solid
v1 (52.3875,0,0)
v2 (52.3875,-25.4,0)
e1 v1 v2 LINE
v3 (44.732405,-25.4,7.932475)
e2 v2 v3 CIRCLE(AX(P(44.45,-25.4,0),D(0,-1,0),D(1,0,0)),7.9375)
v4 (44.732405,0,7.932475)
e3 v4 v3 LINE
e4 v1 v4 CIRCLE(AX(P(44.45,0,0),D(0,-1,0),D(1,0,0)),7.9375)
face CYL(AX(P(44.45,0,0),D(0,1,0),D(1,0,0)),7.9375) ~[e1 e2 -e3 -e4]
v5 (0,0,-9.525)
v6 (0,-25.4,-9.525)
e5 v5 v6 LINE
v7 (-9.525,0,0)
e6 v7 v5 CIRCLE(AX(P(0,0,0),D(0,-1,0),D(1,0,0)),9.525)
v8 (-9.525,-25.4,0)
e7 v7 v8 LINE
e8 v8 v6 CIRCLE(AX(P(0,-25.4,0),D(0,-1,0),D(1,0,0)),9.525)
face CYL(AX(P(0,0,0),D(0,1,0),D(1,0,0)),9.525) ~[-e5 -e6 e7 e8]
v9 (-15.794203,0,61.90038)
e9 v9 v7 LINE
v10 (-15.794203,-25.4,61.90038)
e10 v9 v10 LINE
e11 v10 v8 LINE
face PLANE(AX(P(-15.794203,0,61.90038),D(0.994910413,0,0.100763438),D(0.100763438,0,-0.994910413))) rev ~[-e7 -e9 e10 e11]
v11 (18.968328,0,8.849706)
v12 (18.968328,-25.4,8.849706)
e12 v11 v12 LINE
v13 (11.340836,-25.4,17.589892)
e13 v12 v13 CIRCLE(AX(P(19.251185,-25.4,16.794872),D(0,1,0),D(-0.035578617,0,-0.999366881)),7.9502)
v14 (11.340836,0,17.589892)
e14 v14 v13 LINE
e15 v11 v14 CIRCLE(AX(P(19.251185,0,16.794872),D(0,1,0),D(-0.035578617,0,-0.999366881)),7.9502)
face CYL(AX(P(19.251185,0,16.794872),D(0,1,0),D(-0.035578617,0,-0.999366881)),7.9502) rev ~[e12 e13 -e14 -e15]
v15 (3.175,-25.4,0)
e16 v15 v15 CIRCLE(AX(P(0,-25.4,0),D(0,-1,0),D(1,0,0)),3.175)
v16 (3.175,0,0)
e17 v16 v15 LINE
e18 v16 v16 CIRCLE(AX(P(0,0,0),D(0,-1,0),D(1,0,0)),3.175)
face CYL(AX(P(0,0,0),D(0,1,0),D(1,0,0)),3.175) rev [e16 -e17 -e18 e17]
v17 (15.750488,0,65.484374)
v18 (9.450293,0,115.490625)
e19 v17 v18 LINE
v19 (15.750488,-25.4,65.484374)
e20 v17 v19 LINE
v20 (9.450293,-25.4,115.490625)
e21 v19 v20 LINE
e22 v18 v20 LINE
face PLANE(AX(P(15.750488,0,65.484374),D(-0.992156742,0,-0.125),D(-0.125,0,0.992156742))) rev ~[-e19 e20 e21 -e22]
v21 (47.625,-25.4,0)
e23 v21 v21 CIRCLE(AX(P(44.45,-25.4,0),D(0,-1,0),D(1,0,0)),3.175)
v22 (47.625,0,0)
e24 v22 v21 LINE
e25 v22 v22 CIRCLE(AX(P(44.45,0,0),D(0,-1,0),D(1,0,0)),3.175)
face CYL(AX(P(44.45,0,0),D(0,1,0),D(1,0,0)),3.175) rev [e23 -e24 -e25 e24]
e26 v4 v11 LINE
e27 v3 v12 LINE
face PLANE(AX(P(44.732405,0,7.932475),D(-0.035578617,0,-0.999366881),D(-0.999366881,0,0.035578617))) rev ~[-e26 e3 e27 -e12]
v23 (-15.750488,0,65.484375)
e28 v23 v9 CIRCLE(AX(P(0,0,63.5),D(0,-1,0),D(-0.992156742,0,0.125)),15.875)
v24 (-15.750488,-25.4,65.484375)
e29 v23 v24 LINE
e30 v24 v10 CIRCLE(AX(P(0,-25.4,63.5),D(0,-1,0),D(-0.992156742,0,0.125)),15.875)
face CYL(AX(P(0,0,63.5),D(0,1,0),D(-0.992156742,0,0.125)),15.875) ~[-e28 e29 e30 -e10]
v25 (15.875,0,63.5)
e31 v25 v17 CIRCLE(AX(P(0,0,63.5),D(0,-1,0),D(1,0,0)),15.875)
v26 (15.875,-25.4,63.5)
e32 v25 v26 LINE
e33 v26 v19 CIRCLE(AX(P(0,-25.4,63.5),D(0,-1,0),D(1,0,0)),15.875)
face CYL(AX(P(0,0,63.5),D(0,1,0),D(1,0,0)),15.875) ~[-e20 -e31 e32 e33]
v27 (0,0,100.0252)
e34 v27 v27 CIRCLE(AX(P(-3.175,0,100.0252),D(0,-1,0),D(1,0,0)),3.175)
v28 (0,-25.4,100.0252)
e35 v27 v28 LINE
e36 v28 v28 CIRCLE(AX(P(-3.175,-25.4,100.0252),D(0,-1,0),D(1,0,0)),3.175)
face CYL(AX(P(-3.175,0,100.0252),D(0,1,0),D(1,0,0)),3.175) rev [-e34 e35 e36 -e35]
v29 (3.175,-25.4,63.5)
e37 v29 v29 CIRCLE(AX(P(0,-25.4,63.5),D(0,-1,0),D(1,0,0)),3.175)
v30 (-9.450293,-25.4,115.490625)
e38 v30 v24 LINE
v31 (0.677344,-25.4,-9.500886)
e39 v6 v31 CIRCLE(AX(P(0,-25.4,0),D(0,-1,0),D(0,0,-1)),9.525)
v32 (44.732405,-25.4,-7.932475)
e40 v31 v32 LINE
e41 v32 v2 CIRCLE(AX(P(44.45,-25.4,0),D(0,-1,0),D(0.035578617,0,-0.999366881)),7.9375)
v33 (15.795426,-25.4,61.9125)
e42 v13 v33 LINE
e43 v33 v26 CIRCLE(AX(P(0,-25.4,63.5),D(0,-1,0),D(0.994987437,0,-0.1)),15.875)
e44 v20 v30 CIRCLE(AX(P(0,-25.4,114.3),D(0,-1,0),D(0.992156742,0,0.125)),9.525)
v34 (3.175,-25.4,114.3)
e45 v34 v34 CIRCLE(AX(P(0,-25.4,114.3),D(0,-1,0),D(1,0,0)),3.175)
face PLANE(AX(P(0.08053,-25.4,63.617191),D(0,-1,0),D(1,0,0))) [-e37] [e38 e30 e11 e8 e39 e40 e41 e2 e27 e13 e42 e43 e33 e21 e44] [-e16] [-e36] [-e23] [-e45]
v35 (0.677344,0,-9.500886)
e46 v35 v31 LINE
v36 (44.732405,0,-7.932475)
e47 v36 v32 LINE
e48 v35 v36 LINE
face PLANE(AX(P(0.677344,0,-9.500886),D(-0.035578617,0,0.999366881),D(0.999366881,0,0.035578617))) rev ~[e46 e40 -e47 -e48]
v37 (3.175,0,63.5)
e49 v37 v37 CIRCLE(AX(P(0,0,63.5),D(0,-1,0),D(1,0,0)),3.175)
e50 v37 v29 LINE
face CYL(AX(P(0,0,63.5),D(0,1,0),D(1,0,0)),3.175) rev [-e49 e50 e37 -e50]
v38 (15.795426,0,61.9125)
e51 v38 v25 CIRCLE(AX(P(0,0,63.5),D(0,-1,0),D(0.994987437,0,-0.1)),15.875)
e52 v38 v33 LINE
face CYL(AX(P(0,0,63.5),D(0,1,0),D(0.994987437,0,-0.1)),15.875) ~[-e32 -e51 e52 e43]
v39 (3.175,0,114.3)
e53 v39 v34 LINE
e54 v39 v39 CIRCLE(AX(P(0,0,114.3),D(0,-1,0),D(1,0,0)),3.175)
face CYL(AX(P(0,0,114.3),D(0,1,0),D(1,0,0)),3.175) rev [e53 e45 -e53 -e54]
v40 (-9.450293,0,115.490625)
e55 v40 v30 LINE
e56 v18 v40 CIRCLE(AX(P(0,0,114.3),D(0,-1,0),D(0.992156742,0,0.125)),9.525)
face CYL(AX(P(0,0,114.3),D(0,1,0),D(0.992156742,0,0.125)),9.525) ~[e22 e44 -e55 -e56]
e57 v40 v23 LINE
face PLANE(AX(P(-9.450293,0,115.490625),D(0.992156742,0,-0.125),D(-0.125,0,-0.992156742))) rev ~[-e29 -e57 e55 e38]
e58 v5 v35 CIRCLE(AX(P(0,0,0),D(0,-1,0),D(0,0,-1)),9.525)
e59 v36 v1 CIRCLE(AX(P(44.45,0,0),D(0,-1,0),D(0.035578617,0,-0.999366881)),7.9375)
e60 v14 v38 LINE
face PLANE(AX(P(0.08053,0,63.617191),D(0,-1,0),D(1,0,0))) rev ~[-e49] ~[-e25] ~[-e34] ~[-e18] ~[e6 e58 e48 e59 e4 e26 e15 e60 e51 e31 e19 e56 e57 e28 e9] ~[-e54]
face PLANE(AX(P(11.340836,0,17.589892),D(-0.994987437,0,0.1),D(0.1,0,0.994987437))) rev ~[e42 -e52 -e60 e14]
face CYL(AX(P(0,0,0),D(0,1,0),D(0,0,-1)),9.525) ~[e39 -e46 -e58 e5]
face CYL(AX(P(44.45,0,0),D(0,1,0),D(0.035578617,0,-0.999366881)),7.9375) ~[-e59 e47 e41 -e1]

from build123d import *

# Parameters (mm, degrees)
F2_R     = 3.175
F3_DEPTH = 25.4


# Not quite as in the source:
# - a feature names something its author has since deleted; it is built from what else it names


with BuildPart() as f3:
    # F2 (on Front) → F3 (new body)
    with BuildSketch(Plane.XZ):
        with BuildLine():
            ThreePointArc((15.7504884308, 65.4843737526), (6.286e-07, 79.375), (-15.7504882737, 65.484375))
            ThreePointArc((-15.7504882737, 65.484375), (-15.8738192656, 63.6936154008), (-15.7942028036, 61.9003804205))
            ThreePointArc((-15.7942028036, 61.9003804205), (0.0060905531, 47.6250011683), (15.7954255641, 61.9125))
            ThreePointArc((15.7954255641, 61.9125), (15.8550939106, 62.7052534459), (15.875, 63.5))
            ThreePointArc((15.875, 63.5), (15.8438415297, 64.4941381092), (15.7504884308, 65.4843737526))
        make_face()
        with Locations((0, 63.5)):
            Circle(F2_R, mode=Mode.SUBTRACT)
        with BuildLine():
            Line((-9.4502929642, 115.490625), (-15.7504882737, 65.484375))
            ThreePointArc((-15.7504882737, 65.484375), (6.286e-07, 79.375), (15.7504884308, 65.4843737526))
            Line((15.7504884308, 65.4843737526), (9.4502929642, 115.490625))
            ThreePointArc((9.4502929642, 115.490625), (9.5063048942, 114.896483242), (9.525, 114.3))
            ThreePointArc((9.525, 114.3), (-0.596483242, 104.7936951058), (-9.4502929642, 115.490625))
        make_face()
        with Locations((-3.175, 100.0252)):
            Circle(F2_R, mode=Mode.SUBTRACT)
        with BuildLine():
            ThreePointArc((15.7954255641, 61.9125), (0.0060905531, 47.6250011683), (-15.7942028036, 61.9003804205))
            Line((-15.7942028036, 61.9003804205), (-9.525, 0))
            ThreePointArc((-9.525, 0), (0, 9.525), (9.525, 0))
            ThreePointArc((9.525, 0), (6.9705567315, -6.4912990883), (0.6773435479, -9.500885786))
            Line((0.6773435479, -9.500885786), (44.7324052746, -7.9324746146))
            ThreePointArc((44.7324052746, -7.9324746146), (36.5125, 0), (44.7324052746, 7.9324746146))
            Line((44.7324052746, 7.9324746146), (18.968327868, 8.8497055806))
            ThreePointArc((18.968327868, 8.8497055806), (13.2612039825, 11.5674628959), (11.3408358685, 17.5898921545))
            Line((11.3408358685, 17.5898921545), (15.7954255641, 61.9125))
        make_face()
        with BuildLine():
            ThreePointArc((9.4502929642, 115.490625), (0, 123.825), (-9.4502929642, 115.490625))
            ThreePointArc((-9.4502929642, 115.490625), (-0.596483242, 104.7936951058), (9.525, 114.3))
            ThreePointArc((9.525, 114.3), (9.5063048942, 114.896483242), (9.4502929642, 115.490625))
        make_face()
        with Locations((0, 114.3)):
            Circle(F2_R, mode=Mode.SUBTRACT)
        with BuildLine():
            ThreePointArc((9.525, 0), (0, 9.525), (-9.525, 0))
            ThreePointArc((-9.525, 0), (-6.7351920908, -6.7351920908), (0, -9.525))
            Line((0, -9.525), (0.6773435479, -9.500885786))
            ThreePointArc((0.6773435479, -9.500885786), (6.9705567315, -6.4912990883), (9.525, 0))
        make_face()
        Circle(F2_R, mode=Mode.SUBTRACT)
        with BuildLine():
            Line((0.6773435479, -9.500885786), (0, -9.525))
            ThreePointArc((0, -9.525), (0.3388863295, -9.5189695375), (0.6773435479, -9.500885786))
        make_face()
        with BuildLine():
            ThreePointArc((52.3875, 0), (50.1616327839, 5.5119104847), (44.7324052746, 7.9324746146))
            ThreePointArc((44.7324052746, 7.9324746146), (36.5125, 0), (44.7324052746, -7.9324746146))
            ThreePointArc((44.7324052746, -7.9324746146), (50.1616327839, -5.5119104847), (52.3875, 0))
        make_face()
        with Locations((44.45, 0)):
            Circle(F2_R, mode=Mode.SUBTRACT)
    extrude(amount=F3_DEPTH)


solid = f3.part
